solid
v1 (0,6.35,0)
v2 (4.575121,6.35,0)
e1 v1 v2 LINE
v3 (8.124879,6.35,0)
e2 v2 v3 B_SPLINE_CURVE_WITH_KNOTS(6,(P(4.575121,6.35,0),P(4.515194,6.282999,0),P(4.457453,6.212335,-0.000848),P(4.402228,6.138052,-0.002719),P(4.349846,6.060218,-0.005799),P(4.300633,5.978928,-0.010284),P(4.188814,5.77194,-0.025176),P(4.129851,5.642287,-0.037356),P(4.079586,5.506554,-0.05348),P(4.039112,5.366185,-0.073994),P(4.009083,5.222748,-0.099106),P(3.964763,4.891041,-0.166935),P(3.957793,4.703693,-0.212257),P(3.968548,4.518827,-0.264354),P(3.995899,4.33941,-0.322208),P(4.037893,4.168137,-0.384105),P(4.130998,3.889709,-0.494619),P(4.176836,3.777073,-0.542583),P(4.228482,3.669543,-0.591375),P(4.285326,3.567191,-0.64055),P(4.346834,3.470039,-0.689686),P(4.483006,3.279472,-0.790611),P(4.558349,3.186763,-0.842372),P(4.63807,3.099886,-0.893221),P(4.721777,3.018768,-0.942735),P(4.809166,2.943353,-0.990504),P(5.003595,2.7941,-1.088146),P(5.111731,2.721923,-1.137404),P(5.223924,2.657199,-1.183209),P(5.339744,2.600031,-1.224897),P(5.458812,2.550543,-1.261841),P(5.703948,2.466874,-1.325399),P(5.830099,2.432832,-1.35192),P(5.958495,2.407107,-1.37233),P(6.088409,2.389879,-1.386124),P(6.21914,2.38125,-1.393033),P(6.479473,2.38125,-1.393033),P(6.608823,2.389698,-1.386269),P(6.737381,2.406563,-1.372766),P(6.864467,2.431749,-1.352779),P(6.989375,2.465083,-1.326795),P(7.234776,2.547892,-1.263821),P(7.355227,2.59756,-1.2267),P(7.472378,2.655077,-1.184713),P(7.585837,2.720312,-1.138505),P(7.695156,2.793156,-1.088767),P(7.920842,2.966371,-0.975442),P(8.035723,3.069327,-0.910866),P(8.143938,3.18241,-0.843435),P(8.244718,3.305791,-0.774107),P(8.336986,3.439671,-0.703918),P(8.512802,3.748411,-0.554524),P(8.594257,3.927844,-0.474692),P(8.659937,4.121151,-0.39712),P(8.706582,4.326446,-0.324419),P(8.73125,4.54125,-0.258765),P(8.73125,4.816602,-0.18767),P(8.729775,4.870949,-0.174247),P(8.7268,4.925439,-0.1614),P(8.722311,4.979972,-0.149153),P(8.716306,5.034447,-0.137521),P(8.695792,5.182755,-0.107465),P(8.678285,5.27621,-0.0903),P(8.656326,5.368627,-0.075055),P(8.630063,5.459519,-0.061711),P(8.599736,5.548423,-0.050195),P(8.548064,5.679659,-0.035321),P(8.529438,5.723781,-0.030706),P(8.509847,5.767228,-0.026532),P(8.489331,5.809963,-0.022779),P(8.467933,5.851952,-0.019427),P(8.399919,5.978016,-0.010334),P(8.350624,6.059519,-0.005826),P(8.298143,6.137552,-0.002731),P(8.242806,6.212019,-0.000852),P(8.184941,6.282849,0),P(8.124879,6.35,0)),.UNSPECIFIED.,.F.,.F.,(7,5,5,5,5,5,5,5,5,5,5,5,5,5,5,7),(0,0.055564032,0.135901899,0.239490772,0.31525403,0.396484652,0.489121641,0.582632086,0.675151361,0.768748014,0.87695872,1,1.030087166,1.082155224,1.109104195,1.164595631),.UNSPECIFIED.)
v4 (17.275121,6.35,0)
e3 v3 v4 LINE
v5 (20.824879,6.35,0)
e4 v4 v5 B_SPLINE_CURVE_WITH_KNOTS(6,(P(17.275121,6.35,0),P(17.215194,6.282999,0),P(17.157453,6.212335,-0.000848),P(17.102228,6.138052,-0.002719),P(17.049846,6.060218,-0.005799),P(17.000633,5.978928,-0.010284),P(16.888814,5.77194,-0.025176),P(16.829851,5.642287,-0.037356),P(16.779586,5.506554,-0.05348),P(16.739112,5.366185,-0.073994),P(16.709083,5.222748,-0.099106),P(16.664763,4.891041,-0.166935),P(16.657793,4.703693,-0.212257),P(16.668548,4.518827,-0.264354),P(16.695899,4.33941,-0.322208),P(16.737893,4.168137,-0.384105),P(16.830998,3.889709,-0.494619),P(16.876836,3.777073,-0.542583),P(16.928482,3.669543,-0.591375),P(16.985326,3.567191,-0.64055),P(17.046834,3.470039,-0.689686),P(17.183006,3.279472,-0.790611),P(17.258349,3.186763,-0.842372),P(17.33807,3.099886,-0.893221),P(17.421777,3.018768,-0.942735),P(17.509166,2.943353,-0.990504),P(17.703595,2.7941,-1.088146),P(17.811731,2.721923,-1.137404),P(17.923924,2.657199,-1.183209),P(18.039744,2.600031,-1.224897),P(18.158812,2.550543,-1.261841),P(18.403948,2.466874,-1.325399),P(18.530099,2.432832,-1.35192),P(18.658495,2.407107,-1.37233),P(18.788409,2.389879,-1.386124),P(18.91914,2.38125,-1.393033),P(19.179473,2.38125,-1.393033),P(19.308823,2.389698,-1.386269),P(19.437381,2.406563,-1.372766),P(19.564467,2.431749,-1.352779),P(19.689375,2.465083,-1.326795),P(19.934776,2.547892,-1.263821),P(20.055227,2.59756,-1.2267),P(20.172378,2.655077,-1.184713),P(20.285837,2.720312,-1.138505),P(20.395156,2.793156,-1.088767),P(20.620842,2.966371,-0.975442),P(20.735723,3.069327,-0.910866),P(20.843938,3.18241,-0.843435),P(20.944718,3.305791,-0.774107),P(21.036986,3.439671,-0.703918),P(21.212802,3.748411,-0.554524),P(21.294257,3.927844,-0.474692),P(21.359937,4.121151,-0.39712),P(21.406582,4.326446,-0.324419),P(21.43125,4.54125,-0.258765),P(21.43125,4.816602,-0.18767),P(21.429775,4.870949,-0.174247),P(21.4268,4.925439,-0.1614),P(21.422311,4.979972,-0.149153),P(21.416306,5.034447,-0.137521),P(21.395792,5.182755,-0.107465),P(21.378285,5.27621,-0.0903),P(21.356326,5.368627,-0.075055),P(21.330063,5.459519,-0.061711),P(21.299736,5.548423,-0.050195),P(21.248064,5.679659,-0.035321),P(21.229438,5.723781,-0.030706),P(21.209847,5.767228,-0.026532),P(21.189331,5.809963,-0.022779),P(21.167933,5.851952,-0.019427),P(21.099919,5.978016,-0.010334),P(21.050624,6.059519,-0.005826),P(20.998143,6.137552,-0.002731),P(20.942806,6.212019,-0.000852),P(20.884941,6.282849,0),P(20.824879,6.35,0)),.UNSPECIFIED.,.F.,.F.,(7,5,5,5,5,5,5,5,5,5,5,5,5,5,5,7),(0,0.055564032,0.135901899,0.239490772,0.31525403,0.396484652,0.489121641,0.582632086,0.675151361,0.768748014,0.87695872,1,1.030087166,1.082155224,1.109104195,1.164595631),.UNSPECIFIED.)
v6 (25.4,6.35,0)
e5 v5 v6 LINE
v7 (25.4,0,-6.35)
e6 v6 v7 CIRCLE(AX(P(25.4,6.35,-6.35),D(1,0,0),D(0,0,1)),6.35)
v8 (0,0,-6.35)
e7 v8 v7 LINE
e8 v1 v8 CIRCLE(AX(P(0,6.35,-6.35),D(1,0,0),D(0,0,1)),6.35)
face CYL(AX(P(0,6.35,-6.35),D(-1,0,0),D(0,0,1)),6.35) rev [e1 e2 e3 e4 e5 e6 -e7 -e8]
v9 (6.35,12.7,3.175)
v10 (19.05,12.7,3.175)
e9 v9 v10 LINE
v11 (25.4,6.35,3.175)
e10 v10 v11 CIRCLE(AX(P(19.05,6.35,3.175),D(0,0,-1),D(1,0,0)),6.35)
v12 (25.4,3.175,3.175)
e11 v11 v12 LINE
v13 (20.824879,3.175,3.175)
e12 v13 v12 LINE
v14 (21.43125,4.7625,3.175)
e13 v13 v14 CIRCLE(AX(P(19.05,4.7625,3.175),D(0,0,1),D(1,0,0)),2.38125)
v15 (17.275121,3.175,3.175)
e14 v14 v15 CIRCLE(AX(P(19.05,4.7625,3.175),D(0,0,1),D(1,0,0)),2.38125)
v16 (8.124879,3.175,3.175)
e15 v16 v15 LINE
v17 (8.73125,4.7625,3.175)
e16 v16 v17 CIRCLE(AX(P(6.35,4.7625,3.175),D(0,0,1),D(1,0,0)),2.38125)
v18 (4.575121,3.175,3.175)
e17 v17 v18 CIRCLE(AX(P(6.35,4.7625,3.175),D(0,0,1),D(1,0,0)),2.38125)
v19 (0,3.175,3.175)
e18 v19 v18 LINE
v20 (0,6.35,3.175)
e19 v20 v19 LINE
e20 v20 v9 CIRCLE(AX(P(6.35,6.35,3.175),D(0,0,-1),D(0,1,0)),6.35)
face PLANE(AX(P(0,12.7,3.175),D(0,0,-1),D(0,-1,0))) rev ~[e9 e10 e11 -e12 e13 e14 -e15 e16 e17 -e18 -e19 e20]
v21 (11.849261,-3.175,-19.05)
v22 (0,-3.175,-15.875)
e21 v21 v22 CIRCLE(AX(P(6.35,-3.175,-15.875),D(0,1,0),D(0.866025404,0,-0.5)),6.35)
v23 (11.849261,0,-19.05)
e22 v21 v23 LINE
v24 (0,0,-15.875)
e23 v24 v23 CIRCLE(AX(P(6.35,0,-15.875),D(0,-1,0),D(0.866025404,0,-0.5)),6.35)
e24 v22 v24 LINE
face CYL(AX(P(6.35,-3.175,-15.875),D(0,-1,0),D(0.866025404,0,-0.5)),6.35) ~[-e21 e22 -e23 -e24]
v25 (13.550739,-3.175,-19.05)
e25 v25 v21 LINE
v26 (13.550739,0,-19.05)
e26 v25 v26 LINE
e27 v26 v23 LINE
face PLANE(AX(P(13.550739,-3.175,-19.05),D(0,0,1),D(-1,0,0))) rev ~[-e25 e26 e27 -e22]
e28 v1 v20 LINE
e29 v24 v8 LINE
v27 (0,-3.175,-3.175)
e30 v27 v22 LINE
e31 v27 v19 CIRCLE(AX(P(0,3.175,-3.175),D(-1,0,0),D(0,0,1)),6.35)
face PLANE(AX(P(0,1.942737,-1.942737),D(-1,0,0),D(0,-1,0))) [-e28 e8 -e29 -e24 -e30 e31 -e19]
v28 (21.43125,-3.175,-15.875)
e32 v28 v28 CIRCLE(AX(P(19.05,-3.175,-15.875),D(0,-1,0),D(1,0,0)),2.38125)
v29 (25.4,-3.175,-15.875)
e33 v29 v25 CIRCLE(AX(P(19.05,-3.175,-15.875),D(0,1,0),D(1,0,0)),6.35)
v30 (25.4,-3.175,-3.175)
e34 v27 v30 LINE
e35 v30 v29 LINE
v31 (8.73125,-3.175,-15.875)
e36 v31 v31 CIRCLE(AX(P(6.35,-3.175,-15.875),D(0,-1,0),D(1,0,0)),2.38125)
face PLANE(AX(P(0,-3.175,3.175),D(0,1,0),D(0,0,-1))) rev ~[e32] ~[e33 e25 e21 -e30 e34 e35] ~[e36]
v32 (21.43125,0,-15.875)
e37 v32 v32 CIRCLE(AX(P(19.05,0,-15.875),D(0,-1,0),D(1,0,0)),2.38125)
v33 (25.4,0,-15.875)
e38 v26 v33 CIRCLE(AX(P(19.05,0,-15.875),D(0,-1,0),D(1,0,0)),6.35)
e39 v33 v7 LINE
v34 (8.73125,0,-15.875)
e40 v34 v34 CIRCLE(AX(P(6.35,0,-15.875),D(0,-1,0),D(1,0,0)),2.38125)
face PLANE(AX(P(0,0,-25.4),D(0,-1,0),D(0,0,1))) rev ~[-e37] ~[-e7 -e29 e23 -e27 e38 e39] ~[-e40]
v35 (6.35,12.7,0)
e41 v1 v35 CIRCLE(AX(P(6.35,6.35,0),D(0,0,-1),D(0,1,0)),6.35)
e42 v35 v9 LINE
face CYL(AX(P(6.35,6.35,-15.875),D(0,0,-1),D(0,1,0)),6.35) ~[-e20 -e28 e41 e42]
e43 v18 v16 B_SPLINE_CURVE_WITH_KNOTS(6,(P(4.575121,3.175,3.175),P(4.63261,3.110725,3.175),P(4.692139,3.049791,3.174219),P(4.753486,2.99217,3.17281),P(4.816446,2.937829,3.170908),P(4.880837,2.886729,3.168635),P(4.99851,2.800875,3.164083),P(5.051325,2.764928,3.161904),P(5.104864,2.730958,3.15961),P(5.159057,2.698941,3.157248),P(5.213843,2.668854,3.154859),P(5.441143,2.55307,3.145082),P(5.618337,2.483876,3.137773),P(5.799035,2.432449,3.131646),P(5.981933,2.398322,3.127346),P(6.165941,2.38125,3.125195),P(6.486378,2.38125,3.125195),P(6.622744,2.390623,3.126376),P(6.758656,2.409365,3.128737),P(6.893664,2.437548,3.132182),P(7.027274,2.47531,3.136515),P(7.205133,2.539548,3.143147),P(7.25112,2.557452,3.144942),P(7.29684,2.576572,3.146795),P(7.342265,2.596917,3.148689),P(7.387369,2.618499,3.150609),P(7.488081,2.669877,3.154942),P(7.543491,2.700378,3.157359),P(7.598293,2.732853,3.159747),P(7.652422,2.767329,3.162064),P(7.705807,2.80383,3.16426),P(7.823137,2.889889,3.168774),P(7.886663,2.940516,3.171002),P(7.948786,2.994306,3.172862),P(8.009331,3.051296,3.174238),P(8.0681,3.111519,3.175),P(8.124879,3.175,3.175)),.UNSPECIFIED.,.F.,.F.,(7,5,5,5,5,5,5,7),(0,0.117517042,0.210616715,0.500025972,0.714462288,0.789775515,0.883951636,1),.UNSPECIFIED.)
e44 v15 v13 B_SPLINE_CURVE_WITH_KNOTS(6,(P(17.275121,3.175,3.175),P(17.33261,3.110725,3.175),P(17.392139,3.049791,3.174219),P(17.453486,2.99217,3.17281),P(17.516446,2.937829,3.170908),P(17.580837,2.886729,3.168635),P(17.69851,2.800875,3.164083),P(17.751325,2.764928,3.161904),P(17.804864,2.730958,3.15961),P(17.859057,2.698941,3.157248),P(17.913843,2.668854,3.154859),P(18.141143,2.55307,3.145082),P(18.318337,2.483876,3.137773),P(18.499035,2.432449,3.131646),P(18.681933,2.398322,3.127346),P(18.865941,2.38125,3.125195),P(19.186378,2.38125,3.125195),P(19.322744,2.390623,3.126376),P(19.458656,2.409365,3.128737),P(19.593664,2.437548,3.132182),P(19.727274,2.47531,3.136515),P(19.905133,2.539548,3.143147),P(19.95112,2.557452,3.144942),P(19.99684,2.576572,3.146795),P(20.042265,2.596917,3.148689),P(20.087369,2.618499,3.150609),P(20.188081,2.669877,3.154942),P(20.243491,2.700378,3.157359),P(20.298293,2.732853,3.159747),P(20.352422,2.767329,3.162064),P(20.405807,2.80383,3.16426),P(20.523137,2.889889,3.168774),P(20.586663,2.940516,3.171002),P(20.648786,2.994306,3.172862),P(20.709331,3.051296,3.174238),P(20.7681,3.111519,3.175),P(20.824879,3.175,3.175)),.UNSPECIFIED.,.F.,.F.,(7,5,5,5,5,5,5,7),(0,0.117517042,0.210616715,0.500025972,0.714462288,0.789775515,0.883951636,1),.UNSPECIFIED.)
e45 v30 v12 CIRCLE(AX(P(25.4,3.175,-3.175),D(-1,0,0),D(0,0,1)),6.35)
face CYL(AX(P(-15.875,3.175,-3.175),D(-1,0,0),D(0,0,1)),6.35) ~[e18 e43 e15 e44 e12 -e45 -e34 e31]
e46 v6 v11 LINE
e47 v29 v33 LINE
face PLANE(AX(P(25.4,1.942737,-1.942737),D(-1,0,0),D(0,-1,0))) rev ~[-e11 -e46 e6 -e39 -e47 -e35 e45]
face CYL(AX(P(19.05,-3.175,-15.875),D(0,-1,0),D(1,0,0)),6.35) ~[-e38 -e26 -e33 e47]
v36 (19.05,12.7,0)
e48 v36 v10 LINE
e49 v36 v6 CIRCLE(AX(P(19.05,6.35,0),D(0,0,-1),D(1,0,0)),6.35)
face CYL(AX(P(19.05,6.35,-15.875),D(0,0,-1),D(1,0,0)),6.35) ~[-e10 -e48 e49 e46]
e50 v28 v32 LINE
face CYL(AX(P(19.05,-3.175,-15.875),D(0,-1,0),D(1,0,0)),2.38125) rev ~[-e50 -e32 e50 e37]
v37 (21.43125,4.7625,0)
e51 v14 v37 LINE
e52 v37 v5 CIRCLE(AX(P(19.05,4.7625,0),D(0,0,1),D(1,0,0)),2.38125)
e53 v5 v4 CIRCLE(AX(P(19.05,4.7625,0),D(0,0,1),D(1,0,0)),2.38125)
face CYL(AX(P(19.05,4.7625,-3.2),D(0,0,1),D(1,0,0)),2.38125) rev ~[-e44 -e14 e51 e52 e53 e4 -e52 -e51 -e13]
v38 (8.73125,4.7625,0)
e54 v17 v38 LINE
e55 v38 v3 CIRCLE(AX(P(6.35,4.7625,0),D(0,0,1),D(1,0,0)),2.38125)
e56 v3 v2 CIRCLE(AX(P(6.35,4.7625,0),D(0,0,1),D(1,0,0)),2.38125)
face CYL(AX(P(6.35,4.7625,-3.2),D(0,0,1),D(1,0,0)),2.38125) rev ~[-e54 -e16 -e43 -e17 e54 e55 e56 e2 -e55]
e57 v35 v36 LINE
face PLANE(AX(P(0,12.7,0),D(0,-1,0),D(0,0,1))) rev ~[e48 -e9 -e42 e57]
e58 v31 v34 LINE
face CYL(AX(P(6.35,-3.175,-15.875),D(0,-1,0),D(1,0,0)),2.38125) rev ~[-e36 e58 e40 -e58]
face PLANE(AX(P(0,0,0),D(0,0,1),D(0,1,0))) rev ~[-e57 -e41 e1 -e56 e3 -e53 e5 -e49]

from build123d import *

# Parameters (mm, degrees)
F1_DEPTH     = 25.4
F2_R         = 2.38125
F3_DEPTH     = 28.576
F4_R         = 2.38125
F5_DEPTH     = 15.876
F6_T4_DEPTH  = 25.4
F6_S5_R      = 2.38125
F6_T6_DEPTH  = 15
F6_S7_R      = 2.38125
F6_T8_DEPTH  = 15
F6_T9_DEPTH  = 57.15
F6_T11_DEPTH = 34.925


# Not quite as in the source:
# - a fillet or chamfer that OpenCascade refuses, or shapes differently, is made with other operations: its cross-section is extruded or revolved along the edge and cut away or added


with BuildPart() as f1:
    # F0 (on Right) → F1 (new body)
    with BuildSketch(Plane.YZ):
        Polygon((0, 0), (12.7, 0), (12.7, 3.175), (-3.175, 3.175), (-3.175, -25.4), (0, -25.4), align=None)
    extrude(amount=F1_DEPTH)

    # F2 (on face) → F3 (cut, through all)
    with BuildSketch(Plane.XY.offset(3.175)):
        with Locations((6.35, 4.7625)):
            Circle(F2_R)
        with Locations((19.05, 4.7625)):
            Circle(F2_R)
    extrude(amount=-F3_DEPTH, mode=Mode.SUBTRACT)

    # F4 (on face) → F5 (cut, through all)
    with BuildSketch(Plane.XZ.offset(3.175)):
        with BuildLine():
            Line((13.550738686, -19.05), (11.849261314, -19.05))
            ThreePointArc((11.849261314, -19.05), (4.706499047, -22.0086289925), (0, -15.8749999656))
            Line((0, -15.8749999656), (0, -25.4))
            Line((0, -25.4), (25.4, -25.4))
            Line((25.4, -25.4), (25.4, -15.875))
            ThreePointArc((25.4, -15.875), (20.6935009364, -22.0086289969), (13.550738686, -19.05))
        make_face()
        with Locations((19.05, -15.875)):
            Circle(F4_R)
        with Locations((6.35, -15.875)):
            Circle(F4_R)
    extrude(amount=-F5_DEPTH, mode=Mode.SUBTRACT)

    # F6: fillet of radius 6.35 on 4 edges, made by hand


with BuildPart() as f6_tool2:
    # F6_s3 → F6_t4 (new body)
    with BuildSketch(Plane.YZ):
        with BuildLine():
            ThreePointArc((6.35, 0), (1.8598719395, -1.8598719395), (0, -6.35))
            Line((0, -6.35), (0, 0))
            Line((0, 0), (6.35, 0))
        make_face()
    extrude(amount=F6_T4_DEPTH)

    # F6_s5 → F6_t6 (cut, symmetric)
    with BuildSketch(Plane.XY.offset(-3.2)):
        with Locations((19.05, 4.7625)):
            Circle(F6_S5_R)
    extrude(amount=F6_T6_DEPTH, both=True, mode=Mode.SUBTRACT)

    # F6_s7 → F6_t8 (cut, symmetric)
    with BuildSketch(Plane.XY.offset(-3.2)):
        with Locations((6.35, 4.7625)):
            Circle(F6_S7_R)
    extrude(amount=F6_T8_DEPTH, both=True, mode=Mode.SUBTRACT)


with BuildPart() as f1_1:
    add(f1.part)

    # F6_t1: union F6_tool2
    add(f6_tool2.part)

    # F6_s10 → F6_t9 (cut)
    with BuildSketch(Plane.YZ.offset(-15.875)):
        with BuildLine():
            ThreePointArc((3.175, 3.175), (-1.3151280605, 1.3151280605), (-3.175, -3.175))
            Line((-3.175, -3.175), (-3.175, 3.175))
            Line((-3.175, 3.175), (3.175, 3.175))
        make_face()
    extrude(amount=F6_T9_DEPTH, mode=Mode.SUBTRACT)

    # F6_s12 → F6_t11 (cut)
    with BuildSketch(Plane.XY.offset(-15.875)):
        with BuildLine():
            ThreePointArc((6.35, 12.7), (1.8598719395, 10.8401280605), (0, 6.35))
            Line((0, 6.35), (0, 12.7))
            Line((0, 12.7), (6.35, 12.7))
        make_face()
        with BuildLine():
            ThreePointArc((25.4, 6.35), (23.5401280605, 10.8401280605), (19.05, 12.7))
            Line((19.05, 12.7), (25.4, 12.7))
            Line((25.4, 12.7), (25.4, 6.35))
        make_face()
    extrude(amount=F6_T11_DEPTH, mode=Mode.SUBTRACT)


solid = f1_1.part
